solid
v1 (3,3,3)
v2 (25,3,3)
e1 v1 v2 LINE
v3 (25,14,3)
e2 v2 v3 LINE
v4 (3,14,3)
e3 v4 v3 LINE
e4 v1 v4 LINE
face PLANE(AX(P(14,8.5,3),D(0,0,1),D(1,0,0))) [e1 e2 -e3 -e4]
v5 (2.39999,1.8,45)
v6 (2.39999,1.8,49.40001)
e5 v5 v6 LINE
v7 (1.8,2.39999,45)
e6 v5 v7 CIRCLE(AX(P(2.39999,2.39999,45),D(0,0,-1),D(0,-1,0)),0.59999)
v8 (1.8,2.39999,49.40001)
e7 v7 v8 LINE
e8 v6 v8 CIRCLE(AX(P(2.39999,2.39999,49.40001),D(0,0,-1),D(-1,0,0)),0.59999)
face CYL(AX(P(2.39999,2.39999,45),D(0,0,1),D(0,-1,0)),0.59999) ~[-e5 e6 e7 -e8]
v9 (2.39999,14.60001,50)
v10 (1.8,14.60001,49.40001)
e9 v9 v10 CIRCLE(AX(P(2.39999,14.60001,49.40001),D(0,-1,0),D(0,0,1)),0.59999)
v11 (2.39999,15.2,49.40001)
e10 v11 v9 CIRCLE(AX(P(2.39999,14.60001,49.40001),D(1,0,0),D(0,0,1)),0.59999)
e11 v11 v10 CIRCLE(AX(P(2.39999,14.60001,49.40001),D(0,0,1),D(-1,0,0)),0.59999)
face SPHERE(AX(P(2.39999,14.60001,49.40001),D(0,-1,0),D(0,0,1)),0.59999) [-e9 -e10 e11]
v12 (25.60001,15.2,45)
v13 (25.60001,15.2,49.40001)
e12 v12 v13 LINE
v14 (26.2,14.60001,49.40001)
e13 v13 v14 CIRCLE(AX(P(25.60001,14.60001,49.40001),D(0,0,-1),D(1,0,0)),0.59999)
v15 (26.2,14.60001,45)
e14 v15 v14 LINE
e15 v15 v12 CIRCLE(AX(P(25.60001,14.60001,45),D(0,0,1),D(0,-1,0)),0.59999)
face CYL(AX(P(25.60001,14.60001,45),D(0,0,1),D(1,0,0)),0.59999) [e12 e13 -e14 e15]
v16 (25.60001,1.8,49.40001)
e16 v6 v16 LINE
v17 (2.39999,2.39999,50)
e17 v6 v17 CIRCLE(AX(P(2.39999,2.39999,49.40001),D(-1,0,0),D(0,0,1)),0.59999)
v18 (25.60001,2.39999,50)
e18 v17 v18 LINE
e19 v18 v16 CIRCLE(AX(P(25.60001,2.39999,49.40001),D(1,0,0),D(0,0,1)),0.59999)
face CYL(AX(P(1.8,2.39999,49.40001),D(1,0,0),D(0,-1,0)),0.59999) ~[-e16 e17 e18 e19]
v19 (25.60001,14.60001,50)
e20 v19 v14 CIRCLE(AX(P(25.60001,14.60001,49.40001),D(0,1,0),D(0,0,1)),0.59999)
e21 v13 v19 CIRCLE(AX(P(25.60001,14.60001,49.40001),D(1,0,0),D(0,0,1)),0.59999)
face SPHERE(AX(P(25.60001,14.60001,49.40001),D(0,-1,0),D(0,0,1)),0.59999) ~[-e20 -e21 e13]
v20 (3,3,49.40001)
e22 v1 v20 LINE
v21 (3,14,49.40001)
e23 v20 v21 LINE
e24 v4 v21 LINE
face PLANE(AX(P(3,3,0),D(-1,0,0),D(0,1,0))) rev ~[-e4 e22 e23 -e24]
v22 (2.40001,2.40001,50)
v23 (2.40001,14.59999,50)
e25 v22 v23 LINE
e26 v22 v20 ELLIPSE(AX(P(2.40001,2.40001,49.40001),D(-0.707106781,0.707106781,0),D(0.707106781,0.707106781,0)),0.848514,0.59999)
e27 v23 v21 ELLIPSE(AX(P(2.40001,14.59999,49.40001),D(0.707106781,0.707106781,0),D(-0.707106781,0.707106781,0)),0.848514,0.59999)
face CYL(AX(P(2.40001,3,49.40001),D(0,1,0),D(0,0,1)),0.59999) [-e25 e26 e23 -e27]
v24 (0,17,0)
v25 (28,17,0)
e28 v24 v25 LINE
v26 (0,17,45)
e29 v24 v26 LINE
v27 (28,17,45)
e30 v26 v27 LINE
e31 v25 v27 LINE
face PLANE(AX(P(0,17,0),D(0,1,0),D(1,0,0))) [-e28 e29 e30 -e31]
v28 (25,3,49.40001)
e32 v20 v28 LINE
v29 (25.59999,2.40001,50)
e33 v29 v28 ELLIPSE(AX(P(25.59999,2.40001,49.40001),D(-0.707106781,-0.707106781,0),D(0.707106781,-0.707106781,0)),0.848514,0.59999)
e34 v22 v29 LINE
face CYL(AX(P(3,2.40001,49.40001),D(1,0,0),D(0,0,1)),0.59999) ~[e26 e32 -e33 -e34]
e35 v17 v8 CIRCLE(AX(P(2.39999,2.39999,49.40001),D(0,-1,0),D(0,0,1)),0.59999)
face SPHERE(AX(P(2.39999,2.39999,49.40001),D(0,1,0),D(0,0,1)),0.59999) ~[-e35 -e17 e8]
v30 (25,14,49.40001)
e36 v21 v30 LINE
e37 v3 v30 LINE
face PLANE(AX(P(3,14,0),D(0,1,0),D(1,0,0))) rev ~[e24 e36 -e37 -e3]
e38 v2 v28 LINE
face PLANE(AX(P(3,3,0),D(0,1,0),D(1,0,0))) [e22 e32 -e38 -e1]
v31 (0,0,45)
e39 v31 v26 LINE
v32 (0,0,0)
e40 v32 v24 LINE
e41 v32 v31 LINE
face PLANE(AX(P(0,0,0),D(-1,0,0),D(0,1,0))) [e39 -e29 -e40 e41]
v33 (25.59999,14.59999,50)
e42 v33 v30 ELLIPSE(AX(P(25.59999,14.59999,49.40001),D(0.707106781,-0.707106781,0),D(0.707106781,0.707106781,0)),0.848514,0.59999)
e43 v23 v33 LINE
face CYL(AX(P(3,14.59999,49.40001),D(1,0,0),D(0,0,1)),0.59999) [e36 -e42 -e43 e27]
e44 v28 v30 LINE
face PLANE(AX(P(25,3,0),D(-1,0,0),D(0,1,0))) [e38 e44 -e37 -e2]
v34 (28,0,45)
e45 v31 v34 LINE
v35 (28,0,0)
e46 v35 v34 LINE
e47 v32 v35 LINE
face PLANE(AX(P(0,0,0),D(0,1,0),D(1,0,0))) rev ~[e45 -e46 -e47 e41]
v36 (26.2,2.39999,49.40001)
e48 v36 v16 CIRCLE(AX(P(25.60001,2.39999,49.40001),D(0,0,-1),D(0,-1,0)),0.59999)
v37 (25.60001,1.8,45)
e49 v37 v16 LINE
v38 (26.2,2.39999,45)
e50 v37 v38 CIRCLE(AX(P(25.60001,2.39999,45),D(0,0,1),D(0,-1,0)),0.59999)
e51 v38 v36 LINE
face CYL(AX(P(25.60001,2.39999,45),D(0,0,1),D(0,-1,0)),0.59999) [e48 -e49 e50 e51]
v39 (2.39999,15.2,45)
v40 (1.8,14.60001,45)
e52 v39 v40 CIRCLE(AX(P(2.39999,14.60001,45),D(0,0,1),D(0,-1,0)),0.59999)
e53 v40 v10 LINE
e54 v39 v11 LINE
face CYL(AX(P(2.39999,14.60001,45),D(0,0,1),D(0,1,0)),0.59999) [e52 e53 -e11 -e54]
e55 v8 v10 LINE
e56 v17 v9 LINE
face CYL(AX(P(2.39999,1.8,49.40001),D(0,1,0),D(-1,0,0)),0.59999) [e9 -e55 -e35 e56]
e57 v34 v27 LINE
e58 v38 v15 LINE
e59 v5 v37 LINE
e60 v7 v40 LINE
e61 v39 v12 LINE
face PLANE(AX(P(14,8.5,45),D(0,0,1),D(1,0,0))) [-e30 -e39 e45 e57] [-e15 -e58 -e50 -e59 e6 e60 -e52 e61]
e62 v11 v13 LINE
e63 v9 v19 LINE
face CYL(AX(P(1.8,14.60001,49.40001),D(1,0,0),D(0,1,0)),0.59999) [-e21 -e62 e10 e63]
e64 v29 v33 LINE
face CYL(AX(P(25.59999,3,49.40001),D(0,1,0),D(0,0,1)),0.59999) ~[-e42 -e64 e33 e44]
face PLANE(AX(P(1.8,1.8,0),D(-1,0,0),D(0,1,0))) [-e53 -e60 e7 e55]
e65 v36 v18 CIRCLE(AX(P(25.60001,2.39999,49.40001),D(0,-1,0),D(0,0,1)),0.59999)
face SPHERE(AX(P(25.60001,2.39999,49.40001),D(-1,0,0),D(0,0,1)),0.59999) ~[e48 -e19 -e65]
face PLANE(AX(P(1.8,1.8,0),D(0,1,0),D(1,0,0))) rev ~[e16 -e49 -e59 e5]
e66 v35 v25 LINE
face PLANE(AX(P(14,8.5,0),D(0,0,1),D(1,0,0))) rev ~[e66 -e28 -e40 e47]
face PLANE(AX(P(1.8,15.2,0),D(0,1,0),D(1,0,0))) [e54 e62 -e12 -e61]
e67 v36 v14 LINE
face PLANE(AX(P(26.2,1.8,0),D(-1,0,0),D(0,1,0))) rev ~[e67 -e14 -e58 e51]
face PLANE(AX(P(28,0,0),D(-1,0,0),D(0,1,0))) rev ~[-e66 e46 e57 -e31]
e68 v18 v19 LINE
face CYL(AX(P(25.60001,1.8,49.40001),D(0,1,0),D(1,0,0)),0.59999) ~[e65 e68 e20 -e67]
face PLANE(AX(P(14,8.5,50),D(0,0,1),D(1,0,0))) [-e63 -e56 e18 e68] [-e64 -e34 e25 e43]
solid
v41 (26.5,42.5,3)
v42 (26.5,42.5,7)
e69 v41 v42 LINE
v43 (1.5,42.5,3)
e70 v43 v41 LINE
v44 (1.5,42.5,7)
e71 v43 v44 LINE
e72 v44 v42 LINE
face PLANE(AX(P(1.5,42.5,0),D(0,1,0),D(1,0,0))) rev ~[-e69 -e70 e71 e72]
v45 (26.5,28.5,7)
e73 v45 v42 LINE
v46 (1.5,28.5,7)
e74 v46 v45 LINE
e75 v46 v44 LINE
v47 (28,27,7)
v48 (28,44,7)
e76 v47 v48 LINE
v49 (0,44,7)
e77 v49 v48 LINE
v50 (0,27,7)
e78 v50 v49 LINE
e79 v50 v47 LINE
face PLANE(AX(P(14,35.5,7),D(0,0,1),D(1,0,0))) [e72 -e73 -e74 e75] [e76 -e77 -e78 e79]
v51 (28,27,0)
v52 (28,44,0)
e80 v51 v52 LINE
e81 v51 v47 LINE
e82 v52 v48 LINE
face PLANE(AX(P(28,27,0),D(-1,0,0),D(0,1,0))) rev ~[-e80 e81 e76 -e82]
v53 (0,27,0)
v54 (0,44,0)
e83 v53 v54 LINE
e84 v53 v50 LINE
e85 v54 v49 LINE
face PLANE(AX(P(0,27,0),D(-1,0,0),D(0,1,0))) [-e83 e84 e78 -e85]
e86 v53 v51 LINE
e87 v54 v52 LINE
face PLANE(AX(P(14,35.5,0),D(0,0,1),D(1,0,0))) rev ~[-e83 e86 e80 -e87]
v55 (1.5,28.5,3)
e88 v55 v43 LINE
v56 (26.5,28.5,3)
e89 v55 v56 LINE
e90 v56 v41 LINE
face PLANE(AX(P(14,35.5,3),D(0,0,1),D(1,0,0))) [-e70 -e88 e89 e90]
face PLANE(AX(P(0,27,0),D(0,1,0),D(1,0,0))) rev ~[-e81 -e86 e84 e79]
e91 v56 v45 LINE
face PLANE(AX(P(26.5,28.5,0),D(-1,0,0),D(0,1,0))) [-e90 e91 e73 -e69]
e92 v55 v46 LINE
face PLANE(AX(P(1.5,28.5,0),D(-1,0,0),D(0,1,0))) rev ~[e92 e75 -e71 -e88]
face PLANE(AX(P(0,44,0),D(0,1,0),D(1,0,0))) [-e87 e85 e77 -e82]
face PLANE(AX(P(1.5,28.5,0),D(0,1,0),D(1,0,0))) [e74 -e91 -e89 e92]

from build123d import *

# Parameters (mm, degrees)
F0_W     = 22
F0_H     = 11
F1_DEPTH = 3
F0_W_2   = 25
F0_H_2   = 14
F0_W_3   = 24.4
F0_H_3   = 13.4
F2_DEPTH = 50
F0_W_4   = 28
F0_H_4   = 17
F3_DEPTH = 45
F4_DEPTH = 7
F5_R     = 0.59999


# Not quite as in the source:
# - a fillet or chamfer is up to 0.001 mm smaller than in the source, because OpenCascade refuses the exact size


with BuildPart() as f1:
    # F0 (on Top) → F1 (new body)
    with BuildSketch(Plane.XY):
        with Locations((14, 8.5)):
            Rectangle(F0_W, F0_H)
    extrude(amount=F1_DEPTH)

    # F0 (on Top) → F2 (join)
    with BuildSketch(Plane.XY):
        with Locations((14, 8.5)):
            Rectangle(F0_W_3, F0_H_3)
        with Locations((14, 8.5)):
            Rectangle(F0_W, F0_H, mode=Mode.SUBTRACT)
    extrude(amount=F2_DEPTH)

    # F0 (on Top) → F3 (join)
    with BuildSketch(Plane.XY):
        with Locations((14, 8.5)):
            Rectangle(F0_W_4, F0_H_4)
        with Locations((14, 8.5)):
            Rectangle(F0_W_3, F0_H_3, mode=Mode.SUBTRACT)
    extrude(amount=F3_DEPTH)

    # F5 (radius 0.6 in the source; OpenCascade refuses exactly that, so slightly less here)
    f5_edges = [f1.edges().sort_by_distance(p)[0] for p in [
        (1.8, 8.5, 50),
        (14, 1.8, 50),
        (26.2, 8.5, 50),
        (14, 15.2, 50),
        (14, 3, 50),
        (3, 8.5, 50),
        (14, 14, 50),
        (25, 8.5, 50),
        (26.2, 1.8, 47.5),
        (26.2, 15.2, 47.5),
        (1.8, 15.2, 47.5),
        (1.8, 1.8, 47.5),
    ]]
    fillet(f5_edges, radius=F5_R)


with BuildPart() as f1b:
    # F0 (on Top) → F1, piece 2 (new body)
    with BuildSketch(Plane.XY):
        with Locations((14, 35.5)):
            Rectangle(F0_W_2, F0_H_2)
    extrude(amount=F1_DEPTH)

    # F0 (on Top) → F4 (join)
    with BuildSketch(Plane.XY):
        with Locations((14, 35.5)):
            Rectangle(F0_W_4, F0_H_4)
        with Locations((14, 35.5)):
            Rectangle(F0_W_2, F0_H_2, mode=Mode.SUBTRACT)
    extrude(amount=F4_DEPTH)


solid = Compound([f1.part, f1b.part])
